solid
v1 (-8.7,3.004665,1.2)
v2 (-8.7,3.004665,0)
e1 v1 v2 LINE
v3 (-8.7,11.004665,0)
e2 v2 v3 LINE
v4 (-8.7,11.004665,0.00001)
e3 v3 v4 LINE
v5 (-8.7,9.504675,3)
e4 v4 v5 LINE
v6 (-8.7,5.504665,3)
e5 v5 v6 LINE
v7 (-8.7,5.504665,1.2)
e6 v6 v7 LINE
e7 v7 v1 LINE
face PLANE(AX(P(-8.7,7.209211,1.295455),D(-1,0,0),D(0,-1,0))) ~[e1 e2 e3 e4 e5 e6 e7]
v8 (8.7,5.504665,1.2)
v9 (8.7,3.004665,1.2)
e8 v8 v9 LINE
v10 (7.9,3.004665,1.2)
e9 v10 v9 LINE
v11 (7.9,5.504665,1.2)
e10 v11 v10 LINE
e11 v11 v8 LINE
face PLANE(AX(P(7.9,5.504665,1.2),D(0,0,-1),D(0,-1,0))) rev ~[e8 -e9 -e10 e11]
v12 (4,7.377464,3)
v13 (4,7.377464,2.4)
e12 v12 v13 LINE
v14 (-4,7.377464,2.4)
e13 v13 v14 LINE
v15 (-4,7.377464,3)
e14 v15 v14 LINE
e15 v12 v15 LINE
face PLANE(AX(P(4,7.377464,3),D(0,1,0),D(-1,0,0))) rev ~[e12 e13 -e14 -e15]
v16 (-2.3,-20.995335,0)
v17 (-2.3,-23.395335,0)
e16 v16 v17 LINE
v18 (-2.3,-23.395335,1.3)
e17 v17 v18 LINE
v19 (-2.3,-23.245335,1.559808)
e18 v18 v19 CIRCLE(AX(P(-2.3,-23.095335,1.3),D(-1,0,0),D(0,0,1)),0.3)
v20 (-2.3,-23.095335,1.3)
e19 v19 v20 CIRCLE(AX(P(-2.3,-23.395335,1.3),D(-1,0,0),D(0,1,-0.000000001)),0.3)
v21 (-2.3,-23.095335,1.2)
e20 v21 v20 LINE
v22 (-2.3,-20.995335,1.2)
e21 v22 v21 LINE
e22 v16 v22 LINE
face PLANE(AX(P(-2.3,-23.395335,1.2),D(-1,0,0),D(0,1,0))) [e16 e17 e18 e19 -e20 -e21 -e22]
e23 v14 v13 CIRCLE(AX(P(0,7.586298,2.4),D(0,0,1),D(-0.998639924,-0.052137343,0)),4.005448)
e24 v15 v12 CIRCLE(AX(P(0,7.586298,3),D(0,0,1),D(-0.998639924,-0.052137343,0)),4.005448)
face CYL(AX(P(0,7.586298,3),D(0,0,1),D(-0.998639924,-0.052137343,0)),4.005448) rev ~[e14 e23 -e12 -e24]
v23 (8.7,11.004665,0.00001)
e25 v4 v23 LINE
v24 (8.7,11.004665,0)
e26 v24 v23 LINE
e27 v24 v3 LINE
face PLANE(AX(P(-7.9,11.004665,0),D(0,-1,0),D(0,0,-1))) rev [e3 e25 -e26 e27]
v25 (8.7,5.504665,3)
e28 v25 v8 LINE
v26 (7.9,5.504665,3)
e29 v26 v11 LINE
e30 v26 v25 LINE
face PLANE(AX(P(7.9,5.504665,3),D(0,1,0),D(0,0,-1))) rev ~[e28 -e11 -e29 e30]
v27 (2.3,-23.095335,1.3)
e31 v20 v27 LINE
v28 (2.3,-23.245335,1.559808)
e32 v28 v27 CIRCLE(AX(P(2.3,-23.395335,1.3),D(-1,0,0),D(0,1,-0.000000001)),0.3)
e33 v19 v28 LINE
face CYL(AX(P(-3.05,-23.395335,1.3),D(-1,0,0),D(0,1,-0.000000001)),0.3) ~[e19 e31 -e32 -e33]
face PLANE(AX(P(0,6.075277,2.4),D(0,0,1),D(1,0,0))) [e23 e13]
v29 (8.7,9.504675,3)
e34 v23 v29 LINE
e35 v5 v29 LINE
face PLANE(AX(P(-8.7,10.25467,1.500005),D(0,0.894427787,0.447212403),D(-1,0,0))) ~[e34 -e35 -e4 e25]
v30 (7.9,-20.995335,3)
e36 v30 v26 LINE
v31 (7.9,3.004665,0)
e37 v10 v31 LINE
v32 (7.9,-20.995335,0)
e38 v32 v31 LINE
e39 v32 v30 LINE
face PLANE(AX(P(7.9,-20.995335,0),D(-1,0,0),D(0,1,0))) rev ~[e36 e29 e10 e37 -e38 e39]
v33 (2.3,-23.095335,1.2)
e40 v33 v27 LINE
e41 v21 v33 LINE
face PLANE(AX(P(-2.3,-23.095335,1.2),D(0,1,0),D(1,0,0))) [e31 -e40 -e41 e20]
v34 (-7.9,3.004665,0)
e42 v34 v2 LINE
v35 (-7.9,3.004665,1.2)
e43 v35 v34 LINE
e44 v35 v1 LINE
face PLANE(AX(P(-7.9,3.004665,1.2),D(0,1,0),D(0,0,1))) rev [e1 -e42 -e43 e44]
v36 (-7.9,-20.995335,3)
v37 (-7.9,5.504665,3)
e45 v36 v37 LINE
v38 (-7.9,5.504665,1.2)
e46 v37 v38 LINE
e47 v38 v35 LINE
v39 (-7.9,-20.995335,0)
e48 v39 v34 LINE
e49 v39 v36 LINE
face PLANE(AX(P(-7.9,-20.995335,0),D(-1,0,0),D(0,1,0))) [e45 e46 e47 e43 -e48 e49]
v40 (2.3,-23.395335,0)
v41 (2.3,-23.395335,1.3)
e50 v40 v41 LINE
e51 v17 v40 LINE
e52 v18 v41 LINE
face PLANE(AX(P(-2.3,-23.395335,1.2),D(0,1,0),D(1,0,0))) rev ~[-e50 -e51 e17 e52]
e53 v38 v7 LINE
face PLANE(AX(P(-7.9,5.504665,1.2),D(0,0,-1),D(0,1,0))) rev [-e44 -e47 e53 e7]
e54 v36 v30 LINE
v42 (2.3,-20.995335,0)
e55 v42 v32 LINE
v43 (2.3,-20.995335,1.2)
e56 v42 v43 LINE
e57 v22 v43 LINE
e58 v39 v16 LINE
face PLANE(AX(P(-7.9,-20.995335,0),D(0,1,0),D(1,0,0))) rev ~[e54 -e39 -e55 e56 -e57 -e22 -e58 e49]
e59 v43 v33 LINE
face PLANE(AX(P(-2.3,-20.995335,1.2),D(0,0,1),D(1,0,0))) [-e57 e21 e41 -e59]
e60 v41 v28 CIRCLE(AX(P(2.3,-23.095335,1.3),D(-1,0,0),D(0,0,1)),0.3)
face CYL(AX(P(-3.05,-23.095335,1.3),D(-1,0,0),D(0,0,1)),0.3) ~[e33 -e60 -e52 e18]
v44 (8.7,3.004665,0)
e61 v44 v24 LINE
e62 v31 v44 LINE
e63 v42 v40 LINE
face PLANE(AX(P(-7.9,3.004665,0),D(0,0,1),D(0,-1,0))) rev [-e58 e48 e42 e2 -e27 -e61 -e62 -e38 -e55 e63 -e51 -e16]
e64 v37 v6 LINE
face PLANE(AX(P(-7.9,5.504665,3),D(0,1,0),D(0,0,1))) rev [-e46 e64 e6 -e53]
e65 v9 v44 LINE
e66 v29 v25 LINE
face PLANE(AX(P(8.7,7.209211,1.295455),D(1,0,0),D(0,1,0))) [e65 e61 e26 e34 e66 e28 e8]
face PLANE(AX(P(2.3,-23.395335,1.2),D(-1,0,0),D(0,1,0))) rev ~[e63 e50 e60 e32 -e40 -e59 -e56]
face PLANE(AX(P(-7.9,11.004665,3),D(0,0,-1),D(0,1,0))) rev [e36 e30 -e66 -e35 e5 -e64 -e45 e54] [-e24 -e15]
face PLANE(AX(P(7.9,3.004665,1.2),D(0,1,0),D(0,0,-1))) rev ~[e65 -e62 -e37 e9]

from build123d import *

# Parameters (mm, degrees)
F0_W         = 15.8
F0_H         = 32
F1_DEPTH     = 3
F3_DEPTH     = 0.8
F5_W         = 4.6
F5_H         = 1.2
F6_DEPTH     = 2.4
F8_DEPTH     = 0.6
F9_W         = 4.6
F9_H         = 0.3
F10_DEPTH    = 0.4
F11_T1_DEPTH = 6.1
F12_SIZE2    = 1.49999
F12_SIZE     = 2.99999


# Not quite as in the source:
# - a fillet or chamfer that OpenCascade refuses, or shapes differently, is made with other operations: its cross-section is extruded or revolved along the edge and cut away or added
# - a fillet or chamfer is up to 0.001 mm smaller than in the source, because OpenCascade refuses the exact size


with BuildPart() as f1:
    # F0 (on Top) → F1 (new body)
    with BuildSketch(Plane.XY):
        with Locations((0, -4.9953348935)):
            Rectangle(F0_W, F0_H)
    extrude(amount=F1_DEPTH)

    # F2 (on face) → F3 (join)
    with BuildSketch(Plane.YZ.offset(7.9)):
        Polygon((11.0046651065, 0), (11.0046651065, 3), (5.5046651065, 3), (5.5046651065, 1.2), (3.0046651065, 1.2), (3.0046651065, 0), align=None)
    extrude(amount=F3_DEPTH)

    # F4: F1 across plane


with BuildPart() as f1_1:
    add(f1.part)
    add(f1.part.mirror(Plane.YZ))

    # F5 (on face) → F6 (join)
    with BuildSketch(Plane.XZ.offset(20.9953348935)):
        with Locations((0, 0.6)):
            Rectangle(F5_W, F5_H)
    extrude(amount=F6_DEPTH)

    # F7 (on face) → F8 (cut)
    with BuildSketch(Plane.XY.offset(3)):
        with BuildLine():
            Line((4, 7.3774643242), (-4, 7.3774643242))
            ThreePointArc((-4, 7.3774643242), (0, 3.5808500116), (4, 7.3774643242))
        make_face()
    extrude(amount=-F8_DEPTH, mode=Mode.SUBTRACT)

    # F9 (on face) → F10 (join)
    with BuildSketch(Plane.XY.offset(1.2)):
        with Locations((0, -23.2453348935)):
            Rectangle(F9_W, F9_H)
    extrude(amount=F10_DEPTH)

    # F11: fillet of radius 0.3 on 2 edges, made by hand

    # F11_s2 → F11_t1 (cut)
    with BuildSketch(Plane.YZ.offset(-3.05)):
        with BuildLine():
            ThreePointArc((-23.0953348935, 1.6), (-23.3074669278, 1.5121320344), (-23.3953348935, 1.3))
            Line((-23.3953348935, 1.3), (-23.3953348935, 1.6))
            Line((-23.3953348935, 1.6), (-23.0953348935, 1.6))
        make_face()
        with BuildLine():
            ThreePointArc((-23.0953348935, 1.3), (-23.1832028591, 1.5121320344), (-23.3953348935, 1.6))
            Line((-23.3953348935, 1.6), (-23.0953348935, 1.6))
            Line((-23.0953348935, 1.6), (-23.0953348935, 1.3))
        make_face()
    extrude(amount=F11_T1_DEPTH, mode=Mode.SUBTRACT)

    # F12 (size 3 and 1.5 in the source; OpenCascade refuses exactly that, so slightly less here)
    f12_edges = [f1_1.edges().sort_by_distance(p)[0] for p in [
        (0, 11.004665, 3),
    ]]
    chamfer(f12_edges, length=F12_SIZE, length2=F12_SIZE2)


solid = f1_1.part
